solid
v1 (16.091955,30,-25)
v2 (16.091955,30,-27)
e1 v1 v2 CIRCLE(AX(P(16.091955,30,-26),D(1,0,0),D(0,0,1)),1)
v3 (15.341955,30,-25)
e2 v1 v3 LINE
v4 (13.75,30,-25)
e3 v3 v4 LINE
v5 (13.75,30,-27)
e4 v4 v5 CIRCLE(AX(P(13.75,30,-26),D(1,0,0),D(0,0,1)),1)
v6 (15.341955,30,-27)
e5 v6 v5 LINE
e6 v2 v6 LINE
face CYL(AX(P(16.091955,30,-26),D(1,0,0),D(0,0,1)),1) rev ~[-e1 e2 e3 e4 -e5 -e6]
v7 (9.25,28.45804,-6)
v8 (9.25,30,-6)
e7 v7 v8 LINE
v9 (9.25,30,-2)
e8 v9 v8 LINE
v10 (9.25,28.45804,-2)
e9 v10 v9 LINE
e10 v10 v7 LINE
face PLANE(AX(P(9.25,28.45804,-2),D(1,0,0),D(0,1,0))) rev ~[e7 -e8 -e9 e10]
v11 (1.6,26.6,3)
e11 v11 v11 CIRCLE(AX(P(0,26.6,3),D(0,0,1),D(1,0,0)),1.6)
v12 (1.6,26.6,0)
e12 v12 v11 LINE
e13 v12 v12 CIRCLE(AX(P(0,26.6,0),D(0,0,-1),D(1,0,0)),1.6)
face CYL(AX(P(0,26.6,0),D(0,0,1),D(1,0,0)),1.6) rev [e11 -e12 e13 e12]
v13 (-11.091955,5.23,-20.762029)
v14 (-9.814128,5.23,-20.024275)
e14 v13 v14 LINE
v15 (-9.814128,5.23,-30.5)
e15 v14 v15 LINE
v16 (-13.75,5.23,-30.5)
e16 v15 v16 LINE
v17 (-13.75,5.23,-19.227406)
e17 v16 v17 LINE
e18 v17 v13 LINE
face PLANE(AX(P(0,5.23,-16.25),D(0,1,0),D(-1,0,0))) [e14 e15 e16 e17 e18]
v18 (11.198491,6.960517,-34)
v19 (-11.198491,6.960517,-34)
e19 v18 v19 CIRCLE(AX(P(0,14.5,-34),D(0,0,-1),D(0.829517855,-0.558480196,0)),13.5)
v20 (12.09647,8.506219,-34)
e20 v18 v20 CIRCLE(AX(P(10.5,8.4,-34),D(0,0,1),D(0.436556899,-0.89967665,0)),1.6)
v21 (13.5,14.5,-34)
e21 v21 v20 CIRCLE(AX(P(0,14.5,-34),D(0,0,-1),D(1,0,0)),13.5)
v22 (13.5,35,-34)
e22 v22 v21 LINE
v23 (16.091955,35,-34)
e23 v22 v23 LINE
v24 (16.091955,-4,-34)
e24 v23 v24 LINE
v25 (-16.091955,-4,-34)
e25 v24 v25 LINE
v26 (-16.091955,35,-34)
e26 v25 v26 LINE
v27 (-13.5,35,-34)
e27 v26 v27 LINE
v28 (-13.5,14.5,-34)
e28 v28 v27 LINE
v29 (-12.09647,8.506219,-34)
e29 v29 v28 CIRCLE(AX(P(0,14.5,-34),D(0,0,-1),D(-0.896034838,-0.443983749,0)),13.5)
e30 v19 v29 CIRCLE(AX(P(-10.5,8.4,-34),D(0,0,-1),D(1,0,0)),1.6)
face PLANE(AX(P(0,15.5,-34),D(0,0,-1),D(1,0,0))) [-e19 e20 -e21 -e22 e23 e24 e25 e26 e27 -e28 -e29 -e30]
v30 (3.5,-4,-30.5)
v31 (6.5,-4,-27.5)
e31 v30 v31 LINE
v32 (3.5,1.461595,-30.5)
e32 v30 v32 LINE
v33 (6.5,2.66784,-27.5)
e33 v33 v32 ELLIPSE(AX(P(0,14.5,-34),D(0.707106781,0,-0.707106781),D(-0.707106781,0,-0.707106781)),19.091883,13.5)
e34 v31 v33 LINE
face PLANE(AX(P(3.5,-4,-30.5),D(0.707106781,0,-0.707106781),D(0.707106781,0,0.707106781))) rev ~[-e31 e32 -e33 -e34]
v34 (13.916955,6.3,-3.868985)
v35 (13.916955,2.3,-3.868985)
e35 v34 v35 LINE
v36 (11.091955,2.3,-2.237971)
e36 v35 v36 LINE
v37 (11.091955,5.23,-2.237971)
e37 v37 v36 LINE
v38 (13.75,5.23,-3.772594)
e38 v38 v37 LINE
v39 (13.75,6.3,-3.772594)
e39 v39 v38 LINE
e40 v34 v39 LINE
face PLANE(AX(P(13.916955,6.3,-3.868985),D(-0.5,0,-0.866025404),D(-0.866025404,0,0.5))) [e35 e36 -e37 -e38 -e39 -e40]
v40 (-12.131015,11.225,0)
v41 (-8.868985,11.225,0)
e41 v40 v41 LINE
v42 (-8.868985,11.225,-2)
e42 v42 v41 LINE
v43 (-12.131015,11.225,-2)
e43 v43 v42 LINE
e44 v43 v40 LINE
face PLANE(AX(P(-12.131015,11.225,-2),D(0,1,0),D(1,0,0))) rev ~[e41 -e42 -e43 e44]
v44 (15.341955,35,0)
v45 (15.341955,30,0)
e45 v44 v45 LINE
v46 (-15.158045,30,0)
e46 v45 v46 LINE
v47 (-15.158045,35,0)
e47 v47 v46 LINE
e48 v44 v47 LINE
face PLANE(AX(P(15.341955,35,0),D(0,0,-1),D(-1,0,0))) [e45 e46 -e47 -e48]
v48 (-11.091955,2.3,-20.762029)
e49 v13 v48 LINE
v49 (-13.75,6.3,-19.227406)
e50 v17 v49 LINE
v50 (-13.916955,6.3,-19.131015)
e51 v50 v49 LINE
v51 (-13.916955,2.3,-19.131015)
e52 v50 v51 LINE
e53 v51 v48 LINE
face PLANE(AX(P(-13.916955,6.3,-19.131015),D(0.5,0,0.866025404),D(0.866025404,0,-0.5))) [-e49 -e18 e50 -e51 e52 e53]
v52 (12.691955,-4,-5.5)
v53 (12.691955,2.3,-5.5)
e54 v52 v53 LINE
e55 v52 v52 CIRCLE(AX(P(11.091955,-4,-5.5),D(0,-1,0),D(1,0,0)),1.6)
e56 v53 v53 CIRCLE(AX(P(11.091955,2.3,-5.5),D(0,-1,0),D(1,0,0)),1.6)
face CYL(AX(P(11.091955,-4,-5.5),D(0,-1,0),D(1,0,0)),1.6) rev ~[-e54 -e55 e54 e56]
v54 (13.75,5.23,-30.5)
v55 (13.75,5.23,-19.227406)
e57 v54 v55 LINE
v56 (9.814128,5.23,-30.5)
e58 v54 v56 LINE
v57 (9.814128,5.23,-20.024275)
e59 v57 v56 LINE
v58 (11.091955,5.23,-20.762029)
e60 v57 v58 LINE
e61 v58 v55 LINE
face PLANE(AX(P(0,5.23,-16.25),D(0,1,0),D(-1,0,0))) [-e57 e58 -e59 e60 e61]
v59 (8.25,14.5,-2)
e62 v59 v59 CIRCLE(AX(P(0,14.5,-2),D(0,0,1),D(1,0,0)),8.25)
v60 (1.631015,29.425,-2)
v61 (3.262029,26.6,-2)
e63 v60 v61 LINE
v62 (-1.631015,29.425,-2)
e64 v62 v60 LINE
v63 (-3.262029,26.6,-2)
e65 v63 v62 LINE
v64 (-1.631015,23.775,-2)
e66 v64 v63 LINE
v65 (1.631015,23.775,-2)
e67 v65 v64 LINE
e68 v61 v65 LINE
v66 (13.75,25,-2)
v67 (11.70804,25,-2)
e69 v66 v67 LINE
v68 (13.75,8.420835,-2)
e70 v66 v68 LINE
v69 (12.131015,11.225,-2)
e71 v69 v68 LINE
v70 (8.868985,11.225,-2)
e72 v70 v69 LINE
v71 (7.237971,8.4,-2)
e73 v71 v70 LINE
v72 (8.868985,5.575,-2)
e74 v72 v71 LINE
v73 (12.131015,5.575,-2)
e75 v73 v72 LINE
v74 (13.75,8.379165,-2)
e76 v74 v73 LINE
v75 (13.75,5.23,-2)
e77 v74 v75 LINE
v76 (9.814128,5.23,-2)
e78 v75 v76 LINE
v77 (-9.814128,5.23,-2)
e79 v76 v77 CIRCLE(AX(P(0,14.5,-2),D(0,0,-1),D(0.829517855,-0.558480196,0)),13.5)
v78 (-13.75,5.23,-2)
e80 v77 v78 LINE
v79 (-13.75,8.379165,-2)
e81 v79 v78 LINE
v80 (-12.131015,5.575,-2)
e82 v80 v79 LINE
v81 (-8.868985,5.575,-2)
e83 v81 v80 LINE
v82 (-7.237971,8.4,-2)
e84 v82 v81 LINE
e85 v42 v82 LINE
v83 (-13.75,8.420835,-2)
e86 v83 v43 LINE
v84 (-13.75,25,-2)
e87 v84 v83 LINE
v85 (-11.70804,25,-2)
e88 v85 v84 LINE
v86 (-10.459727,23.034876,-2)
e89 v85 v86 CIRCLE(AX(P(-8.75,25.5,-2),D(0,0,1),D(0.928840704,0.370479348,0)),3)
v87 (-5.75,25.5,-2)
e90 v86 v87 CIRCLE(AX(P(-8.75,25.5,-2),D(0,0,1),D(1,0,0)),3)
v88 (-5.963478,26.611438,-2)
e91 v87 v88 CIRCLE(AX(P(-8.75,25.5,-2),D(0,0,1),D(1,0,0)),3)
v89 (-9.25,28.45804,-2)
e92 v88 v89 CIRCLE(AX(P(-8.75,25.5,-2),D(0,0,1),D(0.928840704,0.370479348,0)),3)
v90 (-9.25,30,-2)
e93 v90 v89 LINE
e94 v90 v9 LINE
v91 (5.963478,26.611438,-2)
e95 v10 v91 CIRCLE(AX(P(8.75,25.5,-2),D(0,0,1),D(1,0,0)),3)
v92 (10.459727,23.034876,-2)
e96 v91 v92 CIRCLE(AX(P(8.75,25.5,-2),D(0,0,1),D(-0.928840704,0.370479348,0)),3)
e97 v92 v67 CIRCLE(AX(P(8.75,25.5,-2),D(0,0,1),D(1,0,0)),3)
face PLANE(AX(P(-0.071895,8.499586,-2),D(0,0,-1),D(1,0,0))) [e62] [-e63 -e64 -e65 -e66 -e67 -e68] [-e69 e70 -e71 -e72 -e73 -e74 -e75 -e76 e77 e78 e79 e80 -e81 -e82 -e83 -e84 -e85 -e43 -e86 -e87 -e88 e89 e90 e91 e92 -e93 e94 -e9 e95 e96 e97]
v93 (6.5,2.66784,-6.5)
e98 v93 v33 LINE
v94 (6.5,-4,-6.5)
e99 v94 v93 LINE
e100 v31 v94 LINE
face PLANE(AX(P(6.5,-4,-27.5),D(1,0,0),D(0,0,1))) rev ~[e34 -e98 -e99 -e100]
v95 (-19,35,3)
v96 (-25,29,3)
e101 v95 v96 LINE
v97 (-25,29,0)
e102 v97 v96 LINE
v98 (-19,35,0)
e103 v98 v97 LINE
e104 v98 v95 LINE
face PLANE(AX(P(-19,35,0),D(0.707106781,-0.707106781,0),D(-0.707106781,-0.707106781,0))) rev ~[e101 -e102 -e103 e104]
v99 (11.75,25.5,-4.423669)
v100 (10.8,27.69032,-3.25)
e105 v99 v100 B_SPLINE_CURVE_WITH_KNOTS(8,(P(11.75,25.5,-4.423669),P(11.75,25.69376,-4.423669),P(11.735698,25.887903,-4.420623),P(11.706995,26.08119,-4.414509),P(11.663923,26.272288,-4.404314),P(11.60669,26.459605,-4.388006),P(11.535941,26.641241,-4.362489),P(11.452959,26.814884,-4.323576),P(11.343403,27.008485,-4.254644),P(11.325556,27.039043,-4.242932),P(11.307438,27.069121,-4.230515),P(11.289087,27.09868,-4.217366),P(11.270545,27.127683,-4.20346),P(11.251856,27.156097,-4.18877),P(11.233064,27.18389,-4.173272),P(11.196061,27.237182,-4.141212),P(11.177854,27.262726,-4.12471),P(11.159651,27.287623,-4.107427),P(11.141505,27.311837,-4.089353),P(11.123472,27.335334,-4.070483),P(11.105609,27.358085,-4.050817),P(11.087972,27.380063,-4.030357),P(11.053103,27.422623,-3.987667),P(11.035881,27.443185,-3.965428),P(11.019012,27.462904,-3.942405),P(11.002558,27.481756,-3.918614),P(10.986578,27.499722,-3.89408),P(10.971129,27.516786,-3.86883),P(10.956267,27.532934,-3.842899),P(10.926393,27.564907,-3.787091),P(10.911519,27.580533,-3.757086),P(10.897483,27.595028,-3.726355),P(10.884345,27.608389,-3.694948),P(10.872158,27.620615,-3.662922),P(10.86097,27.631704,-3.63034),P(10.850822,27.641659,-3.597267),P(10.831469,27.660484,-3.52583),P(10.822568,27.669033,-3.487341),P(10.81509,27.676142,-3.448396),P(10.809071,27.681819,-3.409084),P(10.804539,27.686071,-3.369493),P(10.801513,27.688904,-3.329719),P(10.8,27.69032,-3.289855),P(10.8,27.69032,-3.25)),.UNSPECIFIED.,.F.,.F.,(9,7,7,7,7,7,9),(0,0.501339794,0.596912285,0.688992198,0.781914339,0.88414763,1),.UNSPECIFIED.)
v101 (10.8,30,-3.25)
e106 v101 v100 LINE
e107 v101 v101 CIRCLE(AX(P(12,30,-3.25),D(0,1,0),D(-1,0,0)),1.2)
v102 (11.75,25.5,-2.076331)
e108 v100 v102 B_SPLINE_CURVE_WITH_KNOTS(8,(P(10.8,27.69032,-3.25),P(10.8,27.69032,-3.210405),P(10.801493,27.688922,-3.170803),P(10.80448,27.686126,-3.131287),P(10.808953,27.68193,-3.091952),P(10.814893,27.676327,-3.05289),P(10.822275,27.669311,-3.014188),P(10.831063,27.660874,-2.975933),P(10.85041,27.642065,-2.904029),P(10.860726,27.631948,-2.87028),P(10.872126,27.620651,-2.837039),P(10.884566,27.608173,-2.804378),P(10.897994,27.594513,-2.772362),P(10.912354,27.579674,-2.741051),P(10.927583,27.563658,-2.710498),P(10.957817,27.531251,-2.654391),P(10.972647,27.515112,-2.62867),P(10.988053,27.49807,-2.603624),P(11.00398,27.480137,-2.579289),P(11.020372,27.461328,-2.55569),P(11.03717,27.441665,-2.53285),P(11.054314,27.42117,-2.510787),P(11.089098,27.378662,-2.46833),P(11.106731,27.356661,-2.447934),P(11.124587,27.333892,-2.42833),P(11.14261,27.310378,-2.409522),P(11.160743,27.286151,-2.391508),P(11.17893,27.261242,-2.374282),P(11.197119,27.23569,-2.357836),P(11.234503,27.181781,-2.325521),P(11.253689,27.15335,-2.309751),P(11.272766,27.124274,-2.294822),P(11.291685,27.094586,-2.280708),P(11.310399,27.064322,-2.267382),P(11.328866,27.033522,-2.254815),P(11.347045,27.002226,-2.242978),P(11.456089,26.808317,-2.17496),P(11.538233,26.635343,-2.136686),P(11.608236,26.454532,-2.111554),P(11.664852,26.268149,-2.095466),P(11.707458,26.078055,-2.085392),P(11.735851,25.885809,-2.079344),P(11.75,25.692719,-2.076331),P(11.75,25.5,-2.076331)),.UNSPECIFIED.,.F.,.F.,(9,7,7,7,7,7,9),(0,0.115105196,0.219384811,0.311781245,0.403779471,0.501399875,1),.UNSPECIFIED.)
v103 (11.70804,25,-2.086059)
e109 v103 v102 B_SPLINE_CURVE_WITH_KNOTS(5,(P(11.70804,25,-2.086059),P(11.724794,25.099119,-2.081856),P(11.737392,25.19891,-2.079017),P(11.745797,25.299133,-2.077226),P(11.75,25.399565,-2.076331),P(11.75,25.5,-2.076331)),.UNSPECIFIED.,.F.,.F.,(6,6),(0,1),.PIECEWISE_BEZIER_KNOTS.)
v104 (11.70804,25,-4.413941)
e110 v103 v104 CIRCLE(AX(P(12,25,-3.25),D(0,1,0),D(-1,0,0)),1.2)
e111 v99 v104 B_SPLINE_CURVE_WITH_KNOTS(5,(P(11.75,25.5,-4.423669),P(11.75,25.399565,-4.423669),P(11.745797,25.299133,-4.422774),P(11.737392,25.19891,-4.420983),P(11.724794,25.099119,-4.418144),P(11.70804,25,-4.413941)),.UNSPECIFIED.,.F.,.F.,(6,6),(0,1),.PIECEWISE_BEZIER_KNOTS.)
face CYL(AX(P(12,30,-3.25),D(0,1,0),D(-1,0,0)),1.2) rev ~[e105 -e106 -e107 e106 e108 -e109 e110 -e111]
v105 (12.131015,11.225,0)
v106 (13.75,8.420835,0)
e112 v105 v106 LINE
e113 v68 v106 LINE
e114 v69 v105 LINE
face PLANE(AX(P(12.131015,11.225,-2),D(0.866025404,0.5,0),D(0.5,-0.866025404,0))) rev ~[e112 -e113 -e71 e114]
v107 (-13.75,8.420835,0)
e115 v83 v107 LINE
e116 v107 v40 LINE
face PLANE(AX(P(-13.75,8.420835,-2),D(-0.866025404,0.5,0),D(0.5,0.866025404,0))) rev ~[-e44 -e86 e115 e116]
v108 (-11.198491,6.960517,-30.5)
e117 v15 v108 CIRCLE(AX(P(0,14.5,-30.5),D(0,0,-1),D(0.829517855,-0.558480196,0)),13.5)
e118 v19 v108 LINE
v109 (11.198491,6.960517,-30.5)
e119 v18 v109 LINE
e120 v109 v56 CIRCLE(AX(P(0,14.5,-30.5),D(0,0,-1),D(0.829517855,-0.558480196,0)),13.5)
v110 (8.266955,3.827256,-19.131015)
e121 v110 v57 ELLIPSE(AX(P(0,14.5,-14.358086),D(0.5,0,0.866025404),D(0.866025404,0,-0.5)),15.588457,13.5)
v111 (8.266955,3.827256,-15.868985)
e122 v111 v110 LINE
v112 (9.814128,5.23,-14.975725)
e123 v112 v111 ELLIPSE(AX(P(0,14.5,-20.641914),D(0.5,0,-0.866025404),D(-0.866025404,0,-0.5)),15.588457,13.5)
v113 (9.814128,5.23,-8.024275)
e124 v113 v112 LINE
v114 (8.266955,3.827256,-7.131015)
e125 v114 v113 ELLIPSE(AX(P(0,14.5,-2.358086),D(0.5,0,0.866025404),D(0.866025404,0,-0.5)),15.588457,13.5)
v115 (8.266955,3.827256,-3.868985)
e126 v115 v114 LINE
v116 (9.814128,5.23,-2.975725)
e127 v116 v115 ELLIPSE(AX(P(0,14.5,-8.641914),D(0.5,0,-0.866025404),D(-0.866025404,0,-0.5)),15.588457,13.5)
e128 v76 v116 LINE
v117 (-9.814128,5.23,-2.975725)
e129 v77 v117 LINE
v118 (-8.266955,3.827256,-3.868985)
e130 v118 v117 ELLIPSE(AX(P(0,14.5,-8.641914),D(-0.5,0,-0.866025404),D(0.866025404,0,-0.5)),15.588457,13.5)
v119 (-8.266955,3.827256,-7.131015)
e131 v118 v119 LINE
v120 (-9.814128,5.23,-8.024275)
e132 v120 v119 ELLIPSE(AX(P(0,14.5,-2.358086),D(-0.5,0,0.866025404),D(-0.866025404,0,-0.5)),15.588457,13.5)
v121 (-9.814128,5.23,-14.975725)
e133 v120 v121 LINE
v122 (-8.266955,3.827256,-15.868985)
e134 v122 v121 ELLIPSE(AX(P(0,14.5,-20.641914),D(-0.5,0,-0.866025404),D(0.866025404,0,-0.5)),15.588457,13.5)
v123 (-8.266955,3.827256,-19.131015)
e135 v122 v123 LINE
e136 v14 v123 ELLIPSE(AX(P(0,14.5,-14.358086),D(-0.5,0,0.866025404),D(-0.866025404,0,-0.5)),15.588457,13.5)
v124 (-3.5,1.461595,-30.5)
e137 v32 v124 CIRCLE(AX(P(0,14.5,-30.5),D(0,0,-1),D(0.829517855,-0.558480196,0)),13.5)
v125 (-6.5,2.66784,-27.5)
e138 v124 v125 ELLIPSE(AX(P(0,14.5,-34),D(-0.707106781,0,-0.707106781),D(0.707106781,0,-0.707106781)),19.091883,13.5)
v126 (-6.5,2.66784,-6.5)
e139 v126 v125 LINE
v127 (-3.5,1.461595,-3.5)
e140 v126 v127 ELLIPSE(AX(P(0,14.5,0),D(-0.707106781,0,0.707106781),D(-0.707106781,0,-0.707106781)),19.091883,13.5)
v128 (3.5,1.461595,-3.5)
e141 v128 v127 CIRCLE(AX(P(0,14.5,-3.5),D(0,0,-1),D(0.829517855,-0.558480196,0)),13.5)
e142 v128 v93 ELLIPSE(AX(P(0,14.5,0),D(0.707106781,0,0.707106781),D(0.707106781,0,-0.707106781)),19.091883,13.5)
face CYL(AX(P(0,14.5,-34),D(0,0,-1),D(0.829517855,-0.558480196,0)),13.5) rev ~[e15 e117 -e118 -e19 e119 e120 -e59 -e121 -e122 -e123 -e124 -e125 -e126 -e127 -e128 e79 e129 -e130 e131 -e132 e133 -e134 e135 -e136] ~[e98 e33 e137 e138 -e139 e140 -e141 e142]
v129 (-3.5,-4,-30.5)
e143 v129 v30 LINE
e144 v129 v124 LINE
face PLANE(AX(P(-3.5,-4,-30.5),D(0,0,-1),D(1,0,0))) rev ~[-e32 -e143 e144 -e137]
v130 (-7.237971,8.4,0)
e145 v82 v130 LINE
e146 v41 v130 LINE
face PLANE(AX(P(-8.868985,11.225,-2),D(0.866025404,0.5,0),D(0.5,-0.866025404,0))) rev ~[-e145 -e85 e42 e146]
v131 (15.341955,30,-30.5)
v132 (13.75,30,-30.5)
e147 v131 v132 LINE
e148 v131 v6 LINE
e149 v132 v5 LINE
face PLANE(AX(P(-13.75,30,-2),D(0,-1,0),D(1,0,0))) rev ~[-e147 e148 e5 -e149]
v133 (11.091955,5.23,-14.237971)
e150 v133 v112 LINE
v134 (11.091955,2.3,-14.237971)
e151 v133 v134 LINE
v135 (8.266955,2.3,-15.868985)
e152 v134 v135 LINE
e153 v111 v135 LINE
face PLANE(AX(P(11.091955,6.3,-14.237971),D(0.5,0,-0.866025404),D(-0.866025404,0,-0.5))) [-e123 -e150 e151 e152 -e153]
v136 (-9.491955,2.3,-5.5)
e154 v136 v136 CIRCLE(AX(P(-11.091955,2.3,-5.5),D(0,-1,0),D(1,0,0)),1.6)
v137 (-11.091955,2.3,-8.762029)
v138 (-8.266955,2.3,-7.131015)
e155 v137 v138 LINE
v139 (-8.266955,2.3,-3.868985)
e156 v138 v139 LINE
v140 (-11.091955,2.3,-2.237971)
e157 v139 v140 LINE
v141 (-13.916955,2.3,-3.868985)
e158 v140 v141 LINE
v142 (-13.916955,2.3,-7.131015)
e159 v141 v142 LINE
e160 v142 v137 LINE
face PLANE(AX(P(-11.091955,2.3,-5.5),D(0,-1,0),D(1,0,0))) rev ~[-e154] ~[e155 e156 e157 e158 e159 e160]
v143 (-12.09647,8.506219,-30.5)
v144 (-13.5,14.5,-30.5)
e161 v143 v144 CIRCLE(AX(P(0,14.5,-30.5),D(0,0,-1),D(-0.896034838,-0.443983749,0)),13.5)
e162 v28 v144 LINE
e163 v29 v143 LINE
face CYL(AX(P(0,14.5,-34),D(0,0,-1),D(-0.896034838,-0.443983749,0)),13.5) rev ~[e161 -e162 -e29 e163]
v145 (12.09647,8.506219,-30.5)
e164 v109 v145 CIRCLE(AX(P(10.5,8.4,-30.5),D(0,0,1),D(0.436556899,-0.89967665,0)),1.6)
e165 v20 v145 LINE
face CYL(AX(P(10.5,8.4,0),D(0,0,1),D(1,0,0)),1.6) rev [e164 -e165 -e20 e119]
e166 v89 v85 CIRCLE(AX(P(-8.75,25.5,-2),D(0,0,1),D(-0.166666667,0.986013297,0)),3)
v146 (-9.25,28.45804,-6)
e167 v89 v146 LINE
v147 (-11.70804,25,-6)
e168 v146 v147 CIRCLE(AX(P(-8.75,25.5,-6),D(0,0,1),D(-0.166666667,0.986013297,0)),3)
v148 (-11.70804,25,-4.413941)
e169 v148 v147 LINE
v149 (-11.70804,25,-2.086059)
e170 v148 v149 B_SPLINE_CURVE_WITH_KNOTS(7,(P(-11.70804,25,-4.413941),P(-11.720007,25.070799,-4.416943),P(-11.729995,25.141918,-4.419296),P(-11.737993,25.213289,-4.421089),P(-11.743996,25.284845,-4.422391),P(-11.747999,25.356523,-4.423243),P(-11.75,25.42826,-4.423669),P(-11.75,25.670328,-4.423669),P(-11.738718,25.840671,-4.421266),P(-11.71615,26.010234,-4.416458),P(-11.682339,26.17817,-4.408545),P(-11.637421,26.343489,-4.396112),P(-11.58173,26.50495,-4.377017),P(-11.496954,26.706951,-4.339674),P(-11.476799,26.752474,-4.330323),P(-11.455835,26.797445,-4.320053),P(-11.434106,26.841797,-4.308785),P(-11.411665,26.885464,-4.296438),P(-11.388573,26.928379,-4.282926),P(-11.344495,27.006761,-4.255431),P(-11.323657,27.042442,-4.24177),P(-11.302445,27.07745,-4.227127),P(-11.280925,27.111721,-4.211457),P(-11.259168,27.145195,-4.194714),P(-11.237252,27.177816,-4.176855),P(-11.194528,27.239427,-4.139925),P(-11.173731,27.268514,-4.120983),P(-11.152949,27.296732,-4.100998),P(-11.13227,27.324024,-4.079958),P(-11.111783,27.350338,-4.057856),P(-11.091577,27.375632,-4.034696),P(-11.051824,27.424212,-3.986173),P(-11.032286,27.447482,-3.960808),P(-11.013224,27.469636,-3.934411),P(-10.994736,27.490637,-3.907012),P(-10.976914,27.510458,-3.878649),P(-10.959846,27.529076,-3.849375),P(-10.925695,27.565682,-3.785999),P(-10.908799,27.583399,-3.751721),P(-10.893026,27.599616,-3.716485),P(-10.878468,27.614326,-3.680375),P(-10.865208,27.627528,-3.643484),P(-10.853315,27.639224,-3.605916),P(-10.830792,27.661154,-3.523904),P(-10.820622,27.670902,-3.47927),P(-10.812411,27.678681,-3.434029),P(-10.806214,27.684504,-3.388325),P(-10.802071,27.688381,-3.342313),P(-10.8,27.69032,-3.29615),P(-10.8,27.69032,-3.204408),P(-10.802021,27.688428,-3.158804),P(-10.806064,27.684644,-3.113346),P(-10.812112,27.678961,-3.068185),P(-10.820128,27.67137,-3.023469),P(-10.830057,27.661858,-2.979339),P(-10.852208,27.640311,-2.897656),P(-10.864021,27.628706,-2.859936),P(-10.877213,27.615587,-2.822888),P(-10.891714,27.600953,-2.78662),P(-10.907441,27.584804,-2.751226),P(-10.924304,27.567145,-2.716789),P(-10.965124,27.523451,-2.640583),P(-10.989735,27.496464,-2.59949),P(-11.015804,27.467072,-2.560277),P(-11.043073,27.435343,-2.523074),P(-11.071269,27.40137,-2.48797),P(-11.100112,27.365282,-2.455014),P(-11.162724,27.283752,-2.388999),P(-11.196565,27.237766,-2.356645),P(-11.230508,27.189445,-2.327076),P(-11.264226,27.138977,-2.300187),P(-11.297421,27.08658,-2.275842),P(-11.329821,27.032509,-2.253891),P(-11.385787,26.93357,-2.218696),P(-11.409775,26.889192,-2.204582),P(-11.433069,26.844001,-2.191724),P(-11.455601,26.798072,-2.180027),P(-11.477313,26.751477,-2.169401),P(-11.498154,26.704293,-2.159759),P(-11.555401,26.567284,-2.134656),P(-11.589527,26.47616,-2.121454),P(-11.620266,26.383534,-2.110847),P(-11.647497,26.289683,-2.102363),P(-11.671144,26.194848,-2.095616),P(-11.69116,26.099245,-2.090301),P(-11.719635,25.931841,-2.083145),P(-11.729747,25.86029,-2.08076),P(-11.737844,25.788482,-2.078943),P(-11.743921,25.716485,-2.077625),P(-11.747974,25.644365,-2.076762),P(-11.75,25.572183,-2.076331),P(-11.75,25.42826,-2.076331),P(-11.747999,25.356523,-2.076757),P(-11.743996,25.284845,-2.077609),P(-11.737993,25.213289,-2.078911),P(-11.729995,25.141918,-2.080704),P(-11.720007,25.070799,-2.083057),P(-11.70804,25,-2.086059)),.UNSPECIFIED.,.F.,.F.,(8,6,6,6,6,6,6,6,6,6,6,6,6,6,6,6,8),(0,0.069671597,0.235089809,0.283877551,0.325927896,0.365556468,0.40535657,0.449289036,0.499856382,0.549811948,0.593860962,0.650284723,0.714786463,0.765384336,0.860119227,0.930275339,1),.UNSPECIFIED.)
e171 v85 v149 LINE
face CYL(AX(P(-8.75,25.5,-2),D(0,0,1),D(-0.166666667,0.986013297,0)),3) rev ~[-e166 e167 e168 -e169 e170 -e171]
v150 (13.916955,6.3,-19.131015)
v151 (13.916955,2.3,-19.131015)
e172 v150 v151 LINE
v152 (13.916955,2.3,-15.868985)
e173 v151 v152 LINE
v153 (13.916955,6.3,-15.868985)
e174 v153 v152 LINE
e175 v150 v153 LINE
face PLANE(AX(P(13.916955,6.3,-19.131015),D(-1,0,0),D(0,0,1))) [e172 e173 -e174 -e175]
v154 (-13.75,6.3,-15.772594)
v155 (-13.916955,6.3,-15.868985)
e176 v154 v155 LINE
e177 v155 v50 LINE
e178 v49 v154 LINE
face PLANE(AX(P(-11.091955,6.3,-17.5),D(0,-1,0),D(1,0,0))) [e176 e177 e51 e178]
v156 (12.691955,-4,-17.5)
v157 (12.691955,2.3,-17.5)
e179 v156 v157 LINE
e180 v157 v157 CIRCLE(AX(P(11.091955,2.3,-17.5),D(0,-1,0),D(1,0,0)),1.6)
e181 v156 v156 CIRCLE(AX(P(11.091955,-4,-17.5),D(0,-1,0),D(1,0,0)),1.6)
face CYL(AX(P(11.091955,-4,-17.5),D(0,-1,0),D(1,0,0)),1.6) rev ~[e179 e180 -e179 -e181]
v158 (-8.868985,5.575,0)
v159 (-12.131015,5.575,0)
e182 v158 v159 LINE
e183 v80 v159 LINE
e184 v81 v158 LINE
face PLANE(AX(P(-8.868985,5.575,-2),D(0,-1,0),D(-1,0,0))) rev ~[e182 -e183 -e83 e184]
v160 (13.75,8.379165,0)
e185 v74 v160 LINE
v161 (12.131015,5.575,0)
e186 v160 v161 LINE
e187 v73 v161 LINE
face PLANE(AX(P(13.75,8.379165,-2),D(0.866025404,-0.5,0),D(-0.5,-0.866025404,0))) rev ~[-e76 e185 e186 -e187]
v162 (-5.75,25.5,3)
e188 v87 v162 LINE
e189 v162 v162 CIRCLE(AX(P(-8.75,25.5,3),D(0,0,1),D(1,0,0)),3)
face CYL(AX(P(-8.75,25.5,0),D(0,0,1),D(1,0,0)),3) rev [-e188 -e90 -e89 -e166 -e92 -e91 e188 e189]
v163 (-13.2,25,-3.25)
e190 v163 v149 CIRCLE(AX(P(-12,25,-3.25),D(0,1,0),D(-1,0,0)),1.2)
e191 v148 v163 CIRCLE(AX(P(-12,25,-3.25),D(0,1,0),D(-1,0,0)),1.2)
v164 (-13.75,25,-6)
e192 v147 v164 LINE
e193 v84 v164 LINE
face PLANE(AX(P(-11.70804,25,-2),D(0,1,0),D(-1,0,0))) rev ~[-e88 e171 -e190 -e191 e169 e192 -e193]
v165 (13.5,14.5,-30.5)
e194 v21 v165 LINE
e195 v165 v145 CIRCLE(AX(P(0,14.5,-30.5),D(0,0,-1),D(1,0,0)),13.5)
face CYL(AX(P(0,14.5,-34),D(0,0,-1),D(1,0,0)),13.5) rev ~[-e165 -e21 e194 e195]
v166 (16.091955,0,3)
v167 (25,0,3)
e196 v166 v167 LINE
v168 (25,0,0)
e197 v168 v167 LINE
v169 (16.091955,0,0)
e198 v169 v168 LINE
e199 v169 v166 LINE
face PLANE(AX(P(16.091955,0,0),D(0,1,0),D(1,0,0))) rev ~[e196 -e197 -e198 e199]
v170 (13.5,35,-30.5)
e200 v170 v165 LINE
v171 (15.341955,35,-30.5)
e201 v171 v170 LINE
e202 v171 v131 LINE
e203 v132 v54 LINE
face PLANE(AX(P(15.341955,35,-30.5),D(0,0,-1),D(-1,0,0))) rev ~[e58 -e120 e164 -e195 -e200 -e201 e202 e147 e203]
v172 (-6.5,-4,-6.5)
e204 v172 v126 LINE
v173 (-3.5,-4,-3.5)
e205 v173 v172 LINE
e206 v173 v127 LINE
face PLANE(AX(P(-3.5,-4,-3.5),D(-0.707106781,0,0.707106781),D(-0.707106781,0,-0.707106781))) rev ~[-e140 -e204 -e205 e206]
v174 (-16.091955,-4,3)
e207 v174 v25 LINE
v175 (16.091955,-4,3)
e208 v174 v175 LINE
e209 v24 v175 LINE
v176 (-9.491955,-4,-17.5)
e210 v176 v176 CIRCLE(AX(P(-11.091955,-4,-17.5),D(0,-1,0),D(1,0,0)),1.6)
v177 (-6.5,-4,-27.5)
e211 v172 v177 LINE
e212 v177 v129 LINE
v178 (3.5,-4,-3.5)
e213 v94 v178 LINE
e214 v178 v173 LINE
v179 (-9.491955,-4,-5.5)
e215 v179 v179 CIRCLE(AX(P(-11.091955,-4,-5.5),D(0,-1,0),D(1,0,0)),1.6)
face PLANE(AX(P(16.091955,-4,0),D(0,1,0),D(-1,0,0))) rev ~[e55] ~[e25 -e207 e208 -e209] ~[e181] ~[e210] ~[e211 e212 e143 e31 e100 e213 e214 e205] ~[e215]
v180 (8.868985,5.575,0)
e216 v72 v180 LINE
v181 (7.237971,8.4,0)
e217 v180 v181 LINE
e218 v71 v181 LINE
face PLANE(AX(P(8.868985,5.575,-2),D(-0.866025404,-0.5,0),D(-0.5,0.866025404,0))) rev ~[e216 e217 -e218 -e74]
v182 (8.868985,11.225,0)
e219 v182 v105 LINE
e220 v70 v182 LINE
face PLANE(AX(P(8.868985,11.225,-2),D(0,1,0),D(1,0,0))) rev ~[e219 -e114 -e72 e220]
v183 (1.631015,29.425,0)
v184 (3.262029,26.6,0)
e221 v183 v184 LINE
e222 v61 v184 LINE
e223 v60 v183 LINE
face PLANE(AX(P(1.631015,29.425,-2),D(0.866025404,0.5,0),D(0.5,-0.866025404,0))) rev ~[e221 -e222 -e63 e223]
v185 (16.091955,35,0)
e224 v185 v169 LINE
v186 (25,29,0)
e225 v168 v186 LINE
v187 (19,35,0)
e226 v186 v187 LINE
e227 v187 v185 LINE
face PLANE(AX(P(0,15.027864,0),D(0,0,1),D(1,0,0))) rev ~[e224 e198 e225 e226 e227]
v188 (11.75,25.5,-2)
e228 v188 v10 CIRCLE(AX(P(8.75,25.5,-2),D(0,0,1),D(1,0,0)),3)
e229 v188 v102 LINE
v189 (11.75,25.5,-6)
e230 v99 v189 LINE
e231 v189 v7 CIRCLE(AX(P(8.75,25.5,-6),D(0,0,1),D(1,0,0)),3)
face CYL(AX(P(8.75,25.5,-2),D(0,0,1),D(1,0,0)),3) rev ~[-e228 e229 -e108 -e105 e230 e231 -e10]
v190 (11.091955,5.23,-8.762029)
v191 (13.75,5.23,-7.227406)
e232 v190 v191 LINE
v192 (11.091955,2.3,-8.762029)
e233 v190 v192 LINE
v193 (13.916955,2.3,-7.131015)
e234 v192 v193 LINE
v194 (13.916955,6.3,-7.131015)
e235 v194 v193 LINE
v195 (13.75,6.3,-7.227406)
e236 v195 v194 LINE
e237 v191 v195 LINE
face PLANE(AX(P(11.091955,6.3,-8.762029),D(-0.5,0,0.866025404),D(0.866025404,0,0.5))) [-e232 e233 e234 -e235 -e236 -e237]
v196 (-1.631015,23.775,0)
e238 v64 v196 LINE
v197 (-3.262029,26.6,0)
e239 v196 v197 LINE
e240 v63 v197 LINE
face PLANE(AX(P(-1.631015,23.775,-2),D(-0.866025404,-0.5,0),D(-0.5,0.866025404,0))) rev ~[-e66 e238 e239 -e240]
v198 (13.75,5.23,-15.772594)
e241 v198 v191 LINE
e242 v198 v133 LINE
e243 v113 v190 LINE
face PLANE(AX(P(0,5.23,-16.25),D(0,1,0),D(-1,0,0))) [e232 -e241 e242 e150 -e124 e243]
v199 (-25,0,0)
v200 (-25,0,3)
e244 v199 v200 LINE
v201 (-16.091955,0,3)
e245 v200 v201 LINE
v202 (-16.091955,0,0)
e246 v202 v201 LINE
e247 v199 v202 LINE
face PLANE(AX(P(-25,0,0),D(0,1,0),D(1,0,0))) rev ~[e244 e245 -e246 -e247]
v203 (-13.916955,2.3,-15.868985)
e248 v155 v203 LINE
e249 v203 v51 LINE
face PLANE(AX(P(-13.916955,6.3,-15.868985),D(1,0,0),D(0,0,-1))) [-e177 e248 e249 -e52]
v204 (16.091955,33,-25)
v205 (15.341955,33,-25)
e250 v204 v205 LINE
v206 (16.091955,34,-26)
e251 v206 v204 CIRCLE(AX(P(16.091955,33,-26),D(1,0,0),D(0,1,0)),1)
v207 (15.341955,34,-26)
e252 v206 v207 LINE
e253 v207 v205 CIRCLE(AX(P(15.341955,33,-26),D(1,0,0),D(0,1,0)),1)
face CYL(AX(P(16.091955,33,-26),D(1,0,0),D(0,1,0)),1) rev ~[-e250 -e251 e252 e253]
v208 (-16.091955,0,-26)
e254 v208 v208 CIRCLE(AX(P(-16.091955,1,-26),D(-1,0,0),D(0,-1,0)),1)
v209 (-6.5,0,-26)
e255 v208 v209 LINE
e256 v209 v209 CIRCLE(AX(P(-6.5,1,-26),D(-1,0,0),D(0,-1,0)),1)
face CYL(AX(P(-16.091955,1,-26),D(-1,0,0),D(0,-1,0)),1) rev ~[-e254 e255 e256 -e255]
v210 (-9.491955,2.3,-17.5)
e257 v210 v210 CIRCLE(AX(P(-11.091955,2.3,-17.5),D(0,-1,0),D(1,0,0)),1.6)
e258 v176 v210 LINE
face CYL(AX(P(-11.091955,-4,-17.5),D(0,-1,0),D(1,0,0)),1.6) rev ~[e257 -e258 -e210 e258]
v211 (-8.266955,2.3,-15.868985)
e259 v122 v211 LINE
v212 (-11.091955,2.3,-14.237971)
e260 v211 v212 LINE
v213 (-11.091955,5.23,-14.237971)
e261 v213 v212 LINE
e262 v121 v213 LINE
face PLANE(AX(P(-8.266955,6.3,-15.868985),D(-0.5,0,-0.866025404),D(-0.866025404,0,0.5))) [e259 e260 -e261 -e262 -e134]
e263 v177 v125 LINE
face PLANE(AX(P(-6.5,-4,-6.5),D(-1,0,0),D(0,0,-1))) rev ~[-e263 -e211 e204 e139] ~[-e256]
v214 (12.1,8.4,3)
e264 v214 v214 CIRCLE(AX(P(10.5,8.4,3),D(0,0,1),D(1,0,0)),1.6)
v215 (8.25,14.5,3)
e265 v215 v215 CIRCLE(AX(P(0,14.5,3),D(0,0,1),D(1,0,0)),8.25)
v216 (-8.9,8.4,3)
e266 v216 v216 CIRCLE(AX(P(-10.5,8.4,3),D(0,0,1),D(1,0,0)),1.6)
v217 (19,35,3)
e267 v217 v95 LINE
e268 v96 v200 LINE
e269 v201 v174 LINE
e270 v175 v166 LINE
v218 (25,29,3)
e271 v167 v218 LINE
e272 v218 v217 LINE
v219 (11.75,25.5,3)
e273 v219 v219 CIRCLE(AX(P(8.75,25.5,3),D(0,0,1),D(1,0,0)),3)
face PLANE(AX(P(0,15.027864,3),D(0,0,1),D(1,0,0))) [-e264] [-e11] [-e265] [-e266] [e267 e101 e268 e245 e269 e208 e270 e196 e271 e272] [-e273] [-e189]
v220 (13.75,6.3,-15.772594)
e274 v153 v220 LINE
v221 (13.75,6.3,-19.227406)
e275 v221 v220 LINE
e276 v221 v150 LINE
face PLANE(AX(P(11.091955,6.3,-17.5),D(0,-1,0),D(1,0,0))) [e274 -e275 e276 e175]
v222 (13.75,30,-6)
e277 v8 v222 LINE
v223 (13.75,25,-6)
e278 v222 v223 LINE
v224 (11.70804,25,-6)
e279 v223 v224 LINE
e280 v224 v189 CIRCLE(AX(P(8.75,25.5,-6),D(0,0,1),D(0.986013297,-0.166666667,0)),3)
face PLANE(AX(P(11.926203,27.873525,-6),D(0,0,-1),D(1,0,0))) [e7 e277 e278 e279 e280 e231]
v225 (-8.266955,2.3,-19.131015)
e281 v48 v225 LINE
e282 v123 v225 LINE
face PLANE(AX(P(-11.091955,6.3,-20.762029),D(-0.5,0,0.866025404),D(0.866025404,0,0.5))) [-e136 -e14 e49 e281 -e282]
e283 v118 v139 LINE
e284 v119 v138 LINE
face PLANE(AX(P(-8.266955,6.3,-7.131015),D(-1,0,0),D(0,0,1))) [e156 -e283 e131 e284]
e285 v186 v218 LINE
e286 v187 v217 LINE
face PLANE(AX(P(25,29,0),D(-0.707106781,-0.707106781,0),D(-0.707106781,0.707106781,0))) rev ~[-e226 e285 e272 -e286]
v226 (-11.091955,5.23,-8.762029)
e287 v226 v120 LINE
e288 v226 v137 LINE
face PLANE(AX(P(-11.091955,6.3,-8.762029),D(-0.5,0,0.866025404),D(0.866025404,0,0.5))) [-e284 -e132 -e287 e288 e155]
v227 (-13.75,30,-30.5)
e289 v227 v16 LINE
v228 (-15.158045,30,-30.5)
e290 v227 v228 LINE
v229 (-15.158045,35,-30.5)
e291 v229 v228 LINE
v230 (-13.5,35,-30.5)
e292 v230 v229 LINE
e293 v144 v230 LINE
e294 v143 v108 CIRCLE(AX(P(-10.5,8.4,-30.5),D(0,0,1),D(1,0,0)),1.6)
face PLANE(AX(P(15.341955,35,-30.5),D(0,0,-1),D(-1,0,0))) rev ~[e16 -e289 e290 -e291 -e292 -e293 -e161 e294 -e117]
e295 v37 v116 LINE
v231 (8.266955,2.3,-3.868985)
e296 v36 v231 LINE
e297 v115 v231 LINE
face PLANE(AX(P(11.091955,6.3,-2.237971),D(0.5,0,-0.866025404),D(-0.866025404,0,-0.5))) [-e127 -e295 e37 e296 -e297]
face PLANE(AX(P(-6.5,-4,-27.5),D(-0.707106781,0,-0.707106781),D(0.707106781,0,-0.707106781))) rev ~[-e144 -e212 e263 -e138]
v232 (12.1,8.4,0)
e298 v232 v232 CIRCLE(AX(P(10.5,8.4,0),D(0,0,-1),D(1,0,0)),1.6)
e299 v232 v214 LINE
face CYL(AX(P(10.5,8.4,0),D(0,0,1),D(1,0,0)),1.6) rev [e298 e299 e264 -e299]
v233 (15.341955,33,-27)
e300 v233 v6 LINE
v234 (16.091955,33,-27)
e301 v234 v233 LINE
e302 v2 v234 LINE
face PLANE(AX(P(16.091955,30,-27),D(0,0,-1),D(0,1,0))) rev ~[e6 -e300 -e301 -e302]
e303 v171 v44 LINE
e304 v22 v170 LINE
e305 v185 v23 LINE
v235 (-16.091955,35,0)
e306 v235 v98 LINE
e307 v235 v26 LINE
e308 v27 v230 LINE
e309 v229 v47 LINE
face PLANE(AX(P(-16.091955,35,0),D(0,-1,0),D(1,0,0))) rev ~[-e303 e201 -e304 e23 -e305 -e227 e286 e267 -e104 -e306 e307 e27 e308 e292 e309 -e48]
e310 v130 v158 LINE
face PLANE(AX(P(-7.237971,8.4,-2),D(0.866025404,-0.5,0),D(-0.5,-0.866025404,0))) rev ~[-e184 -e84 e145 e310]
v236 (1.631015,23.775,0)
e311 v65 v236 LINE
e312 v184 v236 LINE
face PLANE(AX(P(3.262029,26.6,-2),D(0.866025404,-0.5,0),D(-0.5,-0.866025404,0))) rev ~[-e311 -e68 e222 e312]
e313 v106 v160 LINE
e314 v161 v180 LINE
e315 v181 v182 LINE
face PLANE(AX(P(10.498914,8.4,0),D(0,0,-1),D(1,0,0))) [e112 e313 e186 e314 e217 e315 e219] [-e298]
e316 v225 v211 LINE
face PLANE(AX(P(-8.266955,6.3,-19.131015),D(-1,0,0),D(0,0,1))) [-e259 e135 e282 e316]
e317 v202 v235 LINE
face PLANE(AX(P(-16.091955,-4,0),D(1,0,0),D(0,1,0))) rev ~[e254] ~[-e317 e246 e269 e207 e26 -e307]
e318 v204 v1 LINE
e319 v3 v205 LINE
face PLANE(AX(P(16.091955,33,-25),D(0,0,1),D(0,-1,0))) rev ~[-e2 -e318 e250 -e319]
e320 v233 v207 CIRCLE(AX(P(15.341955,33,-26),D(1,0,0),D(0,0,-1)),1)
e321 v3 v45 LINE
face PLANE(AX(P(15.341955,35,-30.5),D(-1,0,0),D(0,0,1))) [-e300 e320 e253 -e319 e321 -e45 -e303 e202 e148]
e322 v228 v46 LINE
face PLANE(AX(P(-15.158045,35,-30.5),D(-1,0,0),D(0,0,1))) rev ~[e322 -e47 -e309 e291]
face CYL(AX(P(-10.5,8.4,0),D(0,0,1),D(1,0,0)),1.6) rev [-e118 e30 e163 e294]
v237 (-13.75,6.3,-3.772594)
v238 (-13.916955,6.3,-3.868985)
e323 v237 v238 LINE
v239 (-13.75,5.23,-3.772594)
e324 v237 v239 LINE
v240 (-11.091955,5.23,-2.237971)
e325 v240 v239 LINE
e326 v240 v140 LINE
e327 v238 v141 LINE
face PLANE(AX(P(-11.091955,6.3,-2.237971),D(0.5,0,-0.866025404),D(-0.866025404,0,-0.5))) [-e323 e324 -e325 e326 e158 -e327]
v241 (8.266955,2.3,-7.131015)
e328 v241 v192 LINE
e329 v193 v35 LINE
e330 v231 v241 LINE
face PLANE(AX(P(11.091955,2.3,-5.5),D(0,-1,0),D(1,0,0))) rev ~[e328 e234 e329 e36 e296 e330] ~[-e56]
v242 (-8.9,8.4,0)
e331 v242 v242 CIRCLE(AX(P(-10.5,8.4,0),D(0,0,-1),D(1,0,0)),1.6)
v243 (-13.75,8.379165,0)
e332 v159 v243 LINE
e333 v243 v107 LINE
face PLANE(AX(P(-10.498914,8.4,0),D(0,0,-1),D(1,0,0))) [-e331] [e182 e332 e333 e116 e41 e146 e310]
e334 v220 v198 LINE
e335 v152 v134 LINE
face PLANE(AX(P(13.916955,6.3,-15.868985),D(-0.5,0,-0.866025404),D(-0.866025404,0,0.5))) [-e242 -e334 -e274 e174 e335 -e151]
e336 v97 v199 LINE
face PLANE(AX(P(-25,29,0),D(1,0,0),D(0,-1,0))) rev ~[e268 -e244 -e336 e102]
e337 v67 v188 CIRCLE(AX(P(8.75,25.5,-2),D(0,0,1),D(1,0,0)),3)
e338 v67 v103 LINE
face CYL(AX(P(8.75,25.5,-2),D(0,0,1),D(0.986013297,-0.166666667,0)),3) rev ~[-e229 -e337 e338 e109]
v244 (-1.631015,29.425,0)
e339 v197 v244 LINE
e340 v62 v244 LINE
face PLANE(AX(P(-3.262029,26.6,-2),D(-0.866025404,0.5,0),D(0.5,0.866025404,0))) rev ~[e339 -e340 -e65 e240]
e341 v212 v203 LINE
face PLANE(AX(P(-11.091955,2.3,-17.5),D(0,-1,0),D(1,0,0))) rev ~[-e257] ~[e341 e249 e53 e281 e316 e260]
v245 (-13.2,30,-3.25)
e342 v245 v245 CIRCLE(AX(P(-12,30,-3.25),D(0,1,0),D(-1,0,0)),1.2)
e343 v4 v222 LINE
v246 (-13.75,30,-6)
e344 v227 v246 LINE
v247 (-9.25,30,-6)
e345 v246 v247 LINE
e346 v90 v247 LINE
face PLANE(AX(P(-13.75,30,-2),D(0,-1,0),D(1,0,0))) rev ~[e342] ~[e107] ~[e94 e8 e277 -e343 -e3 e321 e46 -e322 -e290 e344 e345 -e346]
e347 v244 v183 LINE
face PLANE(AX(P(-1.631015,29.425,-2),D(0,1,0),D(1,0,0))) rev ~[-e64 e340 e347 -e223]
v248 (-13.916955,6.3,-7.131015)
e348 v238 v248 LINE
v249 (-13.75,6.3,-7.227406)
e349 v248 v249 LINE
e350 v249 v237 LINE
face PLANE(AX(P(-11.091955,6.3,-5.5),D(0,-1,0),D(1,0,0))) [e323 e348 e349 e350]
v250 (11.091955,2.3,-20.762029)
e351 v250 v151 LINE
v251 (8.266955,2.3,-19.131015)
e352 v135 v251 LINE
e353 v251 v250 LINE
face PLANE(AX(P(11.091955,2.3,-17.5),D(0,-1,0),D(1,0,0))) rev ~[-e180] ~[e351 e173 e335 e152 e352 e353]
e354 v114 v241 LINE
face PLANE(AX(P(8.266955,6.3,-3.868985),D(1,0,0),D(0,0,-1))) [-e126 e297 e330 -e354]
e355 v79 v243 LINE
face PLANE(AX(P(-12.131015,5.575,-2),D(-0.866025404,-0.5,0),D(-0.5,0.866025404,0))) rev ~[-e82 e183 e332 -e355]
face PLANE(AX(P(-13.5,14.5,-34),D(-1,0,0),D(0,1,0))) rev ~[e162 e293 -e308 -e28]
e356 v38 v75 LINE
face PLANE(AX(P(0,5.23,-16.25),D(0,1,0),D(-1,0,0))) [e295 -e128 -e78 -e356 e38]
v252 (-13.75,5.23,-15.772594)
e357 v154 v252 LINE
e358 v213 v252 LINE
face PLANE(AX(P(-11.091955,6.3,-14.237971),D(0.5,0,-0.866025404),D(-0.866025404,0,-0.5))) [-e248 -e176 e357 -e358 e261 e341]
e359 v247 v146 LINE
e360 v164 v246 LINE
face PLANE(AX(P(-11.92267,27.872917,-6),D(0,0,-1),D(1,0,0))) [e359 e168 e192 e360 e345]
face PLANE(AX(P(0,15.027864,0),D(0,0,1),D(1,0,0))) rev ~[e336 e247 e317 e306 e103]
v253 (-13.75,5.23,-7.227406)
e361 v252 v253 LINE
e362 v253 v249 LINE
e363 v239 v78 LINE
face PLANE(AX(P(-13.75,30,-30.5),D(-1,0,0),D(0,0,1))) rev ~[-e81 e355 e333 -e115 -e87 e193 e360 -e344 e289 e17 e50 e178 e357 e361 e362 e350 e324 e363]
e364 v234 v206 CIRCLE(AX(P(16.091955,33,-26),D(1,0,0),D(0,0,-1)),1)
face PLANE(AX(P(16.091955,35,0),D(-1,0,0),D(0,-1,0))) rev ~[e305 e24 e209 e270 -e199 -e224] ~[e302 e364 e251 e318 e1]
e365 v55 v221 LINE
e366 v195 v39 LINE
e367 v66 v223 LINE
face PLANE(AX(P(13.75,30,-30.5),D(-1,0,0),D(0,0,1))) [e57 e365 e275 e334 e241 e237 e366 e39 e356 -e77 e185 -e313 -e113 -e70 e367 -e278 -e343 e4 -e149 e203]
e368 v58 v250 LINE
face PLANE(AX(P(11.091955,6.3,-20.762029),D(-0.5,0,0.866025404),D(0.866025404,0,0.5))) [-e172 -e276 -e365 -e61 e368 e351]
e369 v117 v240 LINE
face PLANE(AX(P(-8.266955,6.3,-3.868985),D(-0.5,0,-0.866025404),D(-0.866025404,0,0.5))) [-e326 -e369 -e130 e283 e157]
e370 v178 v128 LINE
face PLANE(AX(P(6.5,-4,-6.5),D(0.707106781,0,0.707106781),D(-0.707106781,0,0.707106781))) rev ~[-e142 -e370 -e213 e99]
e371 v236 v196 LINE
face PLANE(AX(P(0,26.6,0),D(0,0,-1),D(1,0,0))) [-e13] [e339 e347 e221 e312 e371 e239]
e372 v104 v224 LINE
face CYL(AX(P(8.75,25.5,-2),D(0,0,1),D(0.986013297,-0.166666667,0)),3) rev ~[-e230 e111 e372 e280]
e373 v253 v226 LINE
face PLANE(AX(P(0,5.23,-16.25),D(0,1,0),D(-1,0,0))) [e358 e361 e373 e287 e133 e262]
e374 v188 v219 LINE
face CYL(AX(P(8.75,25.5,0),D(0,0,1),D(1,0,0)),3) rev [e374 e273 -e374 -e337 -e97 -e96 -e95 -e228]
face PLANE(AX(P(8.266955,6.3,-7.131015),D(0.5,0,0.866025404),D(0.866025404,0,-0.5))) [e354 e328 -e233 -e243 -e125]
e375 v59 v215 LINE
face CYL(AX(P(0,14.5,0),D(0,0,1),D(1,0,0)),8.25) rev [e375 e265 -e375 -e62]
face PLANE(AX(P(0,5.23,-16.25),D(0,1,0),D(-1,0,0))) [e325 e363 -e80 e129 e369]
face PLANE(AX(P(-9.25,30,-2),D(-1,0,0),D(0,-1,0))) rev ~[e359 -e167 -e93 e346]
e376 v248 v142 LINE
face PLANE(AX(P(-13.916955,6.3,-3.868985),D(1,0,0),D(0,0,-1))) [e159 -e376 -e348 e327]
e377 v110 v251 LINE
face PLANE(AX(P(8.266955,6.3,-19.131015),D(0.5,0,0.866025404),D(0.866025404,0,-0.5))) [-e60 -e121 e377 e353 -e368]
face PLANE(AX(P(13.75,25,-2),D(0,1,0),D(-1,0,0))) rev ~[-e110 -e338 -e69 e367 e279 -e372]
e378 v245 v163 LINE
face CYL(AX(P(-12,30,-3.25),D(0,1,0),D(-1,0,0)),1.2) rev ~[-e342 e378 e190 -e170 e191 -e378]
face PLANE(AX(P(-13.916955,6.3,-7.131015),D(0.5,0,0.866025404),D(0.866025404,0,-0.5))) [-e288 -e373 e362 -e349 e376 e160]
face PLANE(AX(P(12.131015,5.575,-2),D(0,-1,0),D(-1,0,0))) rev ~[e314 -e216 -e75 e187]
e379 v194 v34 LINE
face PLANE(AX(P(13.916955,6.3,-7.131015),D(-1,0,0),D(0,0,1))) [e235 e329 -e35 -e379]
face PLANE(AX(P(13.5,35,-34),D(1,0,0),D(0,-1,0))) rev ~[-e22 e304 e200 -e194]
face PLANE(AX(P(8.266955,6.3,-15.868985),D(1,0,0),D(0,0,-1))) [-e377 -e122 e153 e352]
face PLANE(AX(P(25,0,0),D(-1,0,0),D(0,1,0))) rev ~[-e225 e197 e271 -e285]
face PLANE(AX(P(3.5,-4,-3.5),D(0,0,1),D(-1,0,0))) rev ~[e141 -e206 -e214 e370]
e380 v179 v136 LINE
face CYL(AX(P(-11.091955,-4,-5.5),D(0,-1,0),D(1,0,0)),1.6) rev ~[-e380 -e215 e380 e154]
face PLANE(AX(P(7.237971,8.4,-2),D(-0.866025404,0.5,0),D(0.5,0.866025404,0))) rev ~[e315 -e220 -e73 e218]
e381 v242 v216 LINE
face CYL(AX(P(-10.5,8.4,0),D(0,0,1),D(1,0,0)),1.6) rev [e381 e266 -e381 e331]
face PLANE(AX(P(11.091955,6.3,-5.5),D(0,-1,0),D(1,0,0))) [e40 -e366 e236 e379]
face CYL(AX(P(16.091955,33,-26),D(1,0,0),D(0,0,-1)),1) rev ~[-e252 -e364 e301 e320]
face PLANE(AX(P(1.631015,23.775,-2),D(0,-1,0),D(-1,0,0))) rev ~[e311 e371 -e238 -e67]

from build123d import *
from build123d import SkipClean  # not in build123d's __all__

# Parameters (mm, degrees)
F0_R      = 1.6
F0_R_2    = 8.25
F0_R_3    = 3
F1_DEPTH  = 3
F2_R      = 3
F2_R_2    = 1.6
F2_R_3    = 8.25
F3_DEPTH  = 34
F4_W      = 30.5
F4_H      = 30.5
F5_DEPTH  = 5
F6_W      = 27.5
F6_H      = 28.5
F7_DEPTH  = 24.77
F9_DEPTH  = 32
F10_R     = 1.6
F11_DEPTH = 39.001
F12_R     = 1.6
F13_DEPTH = 2
F15_DEPTH = 4
F16_R     = 1.6
F17_DEPTH = 4
F20_R     = 1.2
F21_DEPTH = 5
F22_R     = 1
F23_DEPTH = 9.591955051
F25_DEPTH = 2.342955051


# Not quite as in the source:
# - after a boolean that leaves OpenCascade's solid faulty, fix() repairs it


with BuildPart() as f1:
    # F0 (on Top) → F1 (new body)
    with BuildSketch(Plane.XY):
        Polygon((-25, 29), (-25, 0), (-16.091955051, 0), (-16.091955051, -4), (16.091955051, -4), (16.091955051, 0), (25, 0), (25, 29), (19, 35), (-19, 35), align=None)
        with Locations((-10.5, 8.4)):
            Circle(F0_R, mode=Mode.SUBTRACT)
        with Locations((10.5, 8.4)):
            Circle(F0_R, mode=Mode.SUBTRACT)
        with Locations((0, 14.5)):
            Circle(F0_R_2, mode=Mode.SUBTRACT)
        with Locations((-8.75, 25.5)):
            Circle(F0_R_3, mode=Mode.SUBTRACT)
        with Locations((0, 26.6)):
            Circle(F0_R, mode=Mode.SUBTRACT)
        with Locations((8.75, 25.5)):
            Circle(F0_R_3, mode=Mode.SUBTRACT)
    extrude(amount=F1_DEPTH)

    # F2 (on face) → F3 (join)
    with BuildSketch(Plane(origin=(0, 0, 0), x_dir=(1, 0, 0), z_dir=(0, 0, -1))):
        Polygon((16.091955051, 4), (-16.091955051, 4), (-16.091955051, 0), (-16.091955051, -35), (16.091955051, -35), (16.091955051, 0), align=None)
        with Locations((-8.75, -25.5)):
            Circle(F2_R, mode=Mode.SUBTRACT)
        with Locations((0, -26.6)):
            Circle(F2_R_2, mode=Mode.SUBTRACT)
        with Locations((8.75, -25.5)):
            Circle(F2_R, mode=Mode.SUBTRACT)
        with Locations((-10.5, -8.4)):
            Circle(F2_R_2, mode=Mode.SUBTRACT)
        with Locations((0, -14.5)):
            Circle(F2_R_3, mode=Mode.SUBTRACT)
        with Locations((10.5, -8.4)):
            Circle(F2_R_2, mode=Mode.SUBTRACT)
    extrude(amount=F3_DEPTH)

    # F4 (on face) → F5 (cut)
    with BuildSketch(Plane(origin=(0, 35, 0), x_dir=(-1, 0, 0), z_dir=(0, 1, 0))):
        with Locations((-0.091955051, -15.25)):
            Rectangle(F4_W, F4_H)
    extrude(amount=-F5_DEPTH, mode=Mode.SUBTRACT)

    # F6 (on face) → F7 (cut)
    with BuildSketch(Plane(origin=(0, 30, 0), x_dir=(-1, 0, 0), z_dir=(0, 1, 0))):
        with Locations((0, -16.25)):
            Rectangle(F6_W, F6_H)
    extrude(amount=-F7_DEPTH, mode=Mode.SUBTRACT)

    # F8 (on face) → F9 (cut)
    with BuildSketch(Plane(origin=(0, 0, -34), x_dir=(1, 0, 0), z_dir=(0, 0, -1))):
        with BuildLine():
            Line((8.25, -14.5), (13.5, -14.5))
            ThreePointArc((13.5, -14.5), (13.1444351182, -11.4220420042), (12.0964703076, -8.5062193819))
            ThreePointArc((12.0964703076, -8.5062193819), (9.1165222882, -9.2037346707), (11.1984910379, -6.9605173603))
            ThreePointArc((11.1984910379, -6.9605173603), (0, -1), (-11.1984910379, -6.9605173603))
            ThreePointArc((-11.1984910379, -6.9605173603), (-9.6507608289, -7.043979045), (-8.9, -8.4))
            ThreePointArc((-8.9, -8.4), (-10.4468609941, -9.9991173334), (-12.0964703076, -8.5062193819))
            ThreePointArc((-12.0964703076, -8.5062193819), (-13.1444351182, -11.4220420042), (-13.5, -14.5))
            Line((-13.5, -14.5), (-8.25, -14.5))
            ThreePointArc((-8.25, -14.5), (0, -6.25), (8.25, -14.5))
        make_face()
        with BuildLine():
            Line((13.5, -35), (13.5, -14.5))
            ThreePointArc((13.5, -14.5), (12.717238531, -19.0301042091), (10.4597267933, -23.0348764144))
            ThreePointArc((10.4597267933, -23.0348764144), (11.4079296812, -24.1088099303), (11.75, -25.5))
            ThreePointArc((11.75, -25.5), (9.3158770477, -28.4461471733), (5.9634778888, -26.611438043))
            ThreePointArc((5.9634778888, -26.611438043), (3.4585284768, -27.5494666855), (0.8178060745, -27.9752066116))
            ThreePointArc((0.8178060745, -27.9752066116), (0, -28.2), (-0.8178060745, -27.9752066116))
            ThreePointArc((-0.8178060745, -27.9752066116), (-3.4585284768, -27.5494666855), (-5.9634778888, -26.611438043))
            ThreePointArc((-5.9634778888, -26.611438043), (-10.6175706975, -27.8478031625), (-10.4597267933, -23.0348764144))
            ThreePointArc((-10.4597267933, -23.0348764144), (-12.717238531, -19.0301042091), (-13.5, -14.5))
            Line((-13.5, -14.5), (-13.5, -35))
            Line((-13.5, -35), (13.5, -35))
        make_face()
        with BuildLine():
            ThreePointArc((10.4597267933, -23.0348764144), (12.717238531, -19.0301042091), (13.5, -14.5))
            Line((13.5, -14.5), (8.25, -14.5))
            ThreePointArc((8.25, -14.5), (0, -22.75), (-8.25, -14.5))
            Line((-8.25, -14.5), (-13.5, -14.5))
            ThreePointArc((-13.5, -14.5), (-12.717238531, -19.0301042091), (-10.4597267933, -23.0348764144))
            ThreePointArc((-10.4597267933, -23.0348764144), (-7.3588099303, -22.8420703188), (-5.75, -25.5))
            ThreePointArc((-5.75, -25.5), (-5.8038528267, -26.0658770477), (-5.9634778888, -26.611438043))
            ThreePointArc((-5.9634778888, -26.611438043), (-3.4585284768, -27.5494666855), (-0.8178060745, -27.9752066116))
            ThreePointArc((-0.8178060745, -27.9752066116), (-0.7910468636, -25.2092286818), (1.6, -26.6))
            ThreePointArc((1.6, -26.6), (1.3907713182, -27.3910468636), (0.8178060745, -27.9752066116))
            ThreePointArc((0.8178060745, -27.9752066116), (3.4585284768, -27.5494666855), (5.9634778888, -26.611438043))
            ThreePointArc((5.9634778888, -26.611438043), (6.8824293025, -23.1521968375), (10.4597267933, -23.0348764144))
        make_face()
        with BuildLine():
            ThreePointArc((11.1984910379, -6.9605173603), (9.1165222882, -9.2037346707), (12.0964703076, -8.5062193819))
            ThreePointArc((12.0964703076, -8.5062193819), (11.6730931936, -7.7184887161), (11.1984910379, -6.9605173603))
        make_face()
    extrude(amount=-F9_DEPTH, mode=Mode.SUBTRACT)

    # F10 (on face) → F11 (cut, through all)
    with BuildSketch(Plane.XZ.offset(4)):
        with Locations((-11.091955051, -5.5)):
            Circle(F10_R)
        Polygon((-3.5, -3.5), (-6.5, -6.5), (-6.5, -27.5), (-3.5, -30.5), (3.5, -30.5), (6.5, -27.5), (6.5, -6.5), (3.5, -3.5), align=None)
        with Locations((-11.091955051, -17.5)):
            Circle(F10_R)
        with Locations((11.091955051, -17.5)):
            Circle(F10_R)
        with Locations((11.091955051, -5.5)):
            Circle(F10_R)
    extrude(amount=-F11_DEPTH, mode=Mode.SUBTRACT)

    # F12 (on face) → F13 (cut)
    with BuildSketch(Plane(origin=(0, 0, -2), x_dir=(1, 0, 0), z_dir=(0, 0, -1))):
        Polygon((-8.8689854895, -11.225), (-7.2379709791, -8.4), (-8.8689854895, -5.575), (-12.1310145105, -5.575), (-13.75, -8.3791651246), (-13.75, -8.4208348754), (-12.1310145105, -11.225), align=None)
        with Locations((-10.5, -8.4)):
            Circle(F12_R, mode=Mode.SUBTRACT)
        Polygon((12.1310145105, -11.225), (13.75, -8.4208348754), (13.75, -8.3791651246), (12.1310145105, -5.575), (8.8689854895, -5.575), (7.2379709791, -8.4), (8.8689854895, -11.225), align=None)
        with Locations((10.5, -8.4)):
            Circle(F12_R, mode=Mode.SUBTRACT)
        Polygon((1.6310145105, -29.425), (3.2620290209, -26.6), (1.6310145105, -23.775), (-1.6310145105, -23.775), (-3.2620290209, -26.6), (-1.6310145105, -29.425), align=None)
        with Locations((0, -26.6)):
            Circle(F12_R, mode=Mode.SUBTRACT)
    extrude(amount=-F13_DEPTH, mode=Mode.SUBTRACT)

    # F14 (on face) → F15 (join)
    with BuildSketch(Plane(origin=(0, 0, -2), x_dir=(1, 0, 0), z_dir=(0, 0, -1))):
        with BuildLine():
            Line((-13.75, -30), (-9.25, -30))
            Line((-9.25, -30), (-9.25, -28.4580398915))
            ThreePointArc((-9.25, -28.4580398915), (-11.1952034569, -27.2380966757), (-11.7080398915, -25))
            Line((-11.7080398915, -25), (-13.75, -25))
            Line((-13.75, -25), (-13.75, -30))
        make_face()
        with BuildLine():
            Line((9.25, -30), (13.75, -30))
            Line((13.75, -30), (13.75, -25))
            Line((13.75, -25), (11.7080398915, -25))
            ThreePointArc((11.7080398915, -25), (11.7394915684, -25.2491212192), (11.75, -25.5))
            ThreePointArc((11.75, -25.5), (11.0412878475, -27.4364916731), (9.25, -28.4580398915))
            Line((9.25, -28.4580398915), (9.25, -30))
        make_face()
    with SkipClean():  # cleaning this boolean's faces spoils the solid; the shape is the same uncleaned
        extrude(amount=F15_DEPTH)


with BuildPart() as f17:
    # F16 (on face) → F17 (new body)
    with BuildSketch(Plane.XZ.offset(4)):
        Polygon((-11.091955051, -8.7620290209), (-8.266955051, -7.1310145105), (-8.266955051, -3.8689854895), (-11.091955051, -2.2379709791), (-13.916955051, -3.8689854895), (-13.916955051, -7.1310145105), align=None)
        with Locations((-11.091955051, -5.5)):
            Circle(F16_R, mode=Mode.SUBTRACT)
    extrude(amount=F17_DEPTH)


with BuildPart() as f17b:
    # F16 (on face) → F17, piece 2 (new body)
    with BuildSketch(Plane.XZ.offset(4)):
        Polygon((-11.091955051, -20.7620290209), (-8.266955051, -19.1310145105), (-8.266955051, -15.8689854895), (-11.091955051, -14.2379709791), (-13.916955051, -15.8689854895), (-13.916955051, -19.1310145105), align=None)
        with Locations((-11.091955051, -17.5)):
            Circle(F16_R, mode=Mode.SUBTRACT)
    extrude(amount=F17_DEPTH)


with BuildPart() as f17c:
    # F16 (on face) → F17, piece 3 (new body)
    with BuildSketch(Plane.XZ.offset(4)):
        Polygon((11.091955051, -20.7620290209), (13.916955051, -19.1310145105), (13.916955051, -15.8689854895), (11.091955051, -14.2379709791), (8.266955051, -15.8689854895), (8.266955051, -19.1310145105), align=None)
        with Locations((11.091955051, -17.5)):
            Circle(F16_R, mode=Mode.SUBTRACT)
    extrude(amount=F17_DEPTH)


with BuildPart() as f17d:
    # F16 (on face) → F17, piece 4 (new body)
    with BuildSketch(Plane.XZ.offset(4)):
        Polygon((11.091955051, -8.7620290209), (13.916955051, -7.1310145105), (13.916955051, -3.8689854895), (11.091955051, -2.2379709791), (8.266955051, -3.8689854895), (8.266955051, -7.1310145105), align=None)
        with Locations((11.091955051, -5.5)):
            Circle(F16_R, mode=Mode.SUBTRACT)
    extrude(amount=F17_DEPTH)


with BuildPart() as f17_1:
    # F18: moved
    add(f17.part.moved(Location((0, 10.3, 0))), clean=False)


with BuildPart() as f17b_1:
    # F18: moved
    add(f17b.part.moved(Location((0, 10.3, 0))), clean=False)


with BuildPart() as f17d_1:
    # F18: moved
    add(f17d.part.moved(Location((0, 10.3, 0))), clean=False)


with BuildPart() as f17c_1:
    # F18: moved
    add(f17c.part.moved(Location((0, 10.3, 0))), clean=False)


with BuildPart() as f1_1:
    add(f1.part, clean=False)

    # F19: cut F17, F17b, F17d, F17c
    add(f17_1.part, mode=Mode.SUBTRACT)
    add(f17b_1.part, mode=Mode.SUBTRACT)
    add(f17d_1.part, mode=Mode.SUBTRACT)
    add(f17c_1.part, mode=Mode.SUBTRACT)

    add(f1_1.part.fix(), mode=Mode.REPLACE)

    # F20 (on face) → F21 (cut, through all)
    with BuildSketch(Plane(origin=(0, 30, 0), x_dir=(-1, 0, 0), z_dir=(0, 1, 0))):
        with Locations((-12, -3.25)):
            Circle(F20_R)
        with Locations((12, -3.25)):
            Circle(F20_R)
    extrude(amount=-F21_DEPTH, mode=Mode.SUBTRACT)

    # F22 (on face) → F23 (cut, through all)
    with BuildSketch(Plane(origin=(-16.091955051, 0, 0), x_dir=(0, -1, 0), z_dir=(-1, 0, 0))):
        with Locations((-1, -26)):
            Circle(F22_R)
    extrude(amount=-F23_DEPTH, mode=Mode.SUBTRACT)

    # F24 (on face) → F25 (cut, through all)
    with BuildSketch(Plane.YZ.offset(16.091955051)):
        with BuildLine():
            ThreePointArc((30, -27), (30.7071067812, -26.7071067812), (31, -26))
            ThreePointArc((31, -26), (30.7071067812, -25.2928932188), (30, -25))
            Line((30, -25), (30, -27))
        make_face()
        with BuildLine():
            Line((30, -27), (30, -25))
            ThreePointArc((30, -25), (29, -26), (30, -27))
        make_face()
        with BuildLine():
            ThreePointArc((30, -25), (30.7071067812, -25.2928932188), (31, -26))
            ThreePointArc((31, -26), (30.7071067812, -26.7071067812), (30, -27))
            Line((30, -27), (33, -27))
            ThreePointArc((33, -27), (32, -26), (33, -25))
            Line((33, -25), (30, -25))
        make_face()
        with BuildLine():
            ThreePointArc((34, -26), (33.7071067812, -25.2928932188), (33, -25))
            Line((33, -25), (33, -27))
            ThreePointArc((33, -27), (33.7071067812, -26.7071067812), (34, -26))
        make_face()
        with BuildLine():
            Line((33, -27), (33, -25))
            ThreePointArc((33, -25), (32, -26), (33, -27))
        make_face()
    extrude(amount=-F25_DEPTH, mode=Mode.SUBTRACT)


solid = f1_1.part
